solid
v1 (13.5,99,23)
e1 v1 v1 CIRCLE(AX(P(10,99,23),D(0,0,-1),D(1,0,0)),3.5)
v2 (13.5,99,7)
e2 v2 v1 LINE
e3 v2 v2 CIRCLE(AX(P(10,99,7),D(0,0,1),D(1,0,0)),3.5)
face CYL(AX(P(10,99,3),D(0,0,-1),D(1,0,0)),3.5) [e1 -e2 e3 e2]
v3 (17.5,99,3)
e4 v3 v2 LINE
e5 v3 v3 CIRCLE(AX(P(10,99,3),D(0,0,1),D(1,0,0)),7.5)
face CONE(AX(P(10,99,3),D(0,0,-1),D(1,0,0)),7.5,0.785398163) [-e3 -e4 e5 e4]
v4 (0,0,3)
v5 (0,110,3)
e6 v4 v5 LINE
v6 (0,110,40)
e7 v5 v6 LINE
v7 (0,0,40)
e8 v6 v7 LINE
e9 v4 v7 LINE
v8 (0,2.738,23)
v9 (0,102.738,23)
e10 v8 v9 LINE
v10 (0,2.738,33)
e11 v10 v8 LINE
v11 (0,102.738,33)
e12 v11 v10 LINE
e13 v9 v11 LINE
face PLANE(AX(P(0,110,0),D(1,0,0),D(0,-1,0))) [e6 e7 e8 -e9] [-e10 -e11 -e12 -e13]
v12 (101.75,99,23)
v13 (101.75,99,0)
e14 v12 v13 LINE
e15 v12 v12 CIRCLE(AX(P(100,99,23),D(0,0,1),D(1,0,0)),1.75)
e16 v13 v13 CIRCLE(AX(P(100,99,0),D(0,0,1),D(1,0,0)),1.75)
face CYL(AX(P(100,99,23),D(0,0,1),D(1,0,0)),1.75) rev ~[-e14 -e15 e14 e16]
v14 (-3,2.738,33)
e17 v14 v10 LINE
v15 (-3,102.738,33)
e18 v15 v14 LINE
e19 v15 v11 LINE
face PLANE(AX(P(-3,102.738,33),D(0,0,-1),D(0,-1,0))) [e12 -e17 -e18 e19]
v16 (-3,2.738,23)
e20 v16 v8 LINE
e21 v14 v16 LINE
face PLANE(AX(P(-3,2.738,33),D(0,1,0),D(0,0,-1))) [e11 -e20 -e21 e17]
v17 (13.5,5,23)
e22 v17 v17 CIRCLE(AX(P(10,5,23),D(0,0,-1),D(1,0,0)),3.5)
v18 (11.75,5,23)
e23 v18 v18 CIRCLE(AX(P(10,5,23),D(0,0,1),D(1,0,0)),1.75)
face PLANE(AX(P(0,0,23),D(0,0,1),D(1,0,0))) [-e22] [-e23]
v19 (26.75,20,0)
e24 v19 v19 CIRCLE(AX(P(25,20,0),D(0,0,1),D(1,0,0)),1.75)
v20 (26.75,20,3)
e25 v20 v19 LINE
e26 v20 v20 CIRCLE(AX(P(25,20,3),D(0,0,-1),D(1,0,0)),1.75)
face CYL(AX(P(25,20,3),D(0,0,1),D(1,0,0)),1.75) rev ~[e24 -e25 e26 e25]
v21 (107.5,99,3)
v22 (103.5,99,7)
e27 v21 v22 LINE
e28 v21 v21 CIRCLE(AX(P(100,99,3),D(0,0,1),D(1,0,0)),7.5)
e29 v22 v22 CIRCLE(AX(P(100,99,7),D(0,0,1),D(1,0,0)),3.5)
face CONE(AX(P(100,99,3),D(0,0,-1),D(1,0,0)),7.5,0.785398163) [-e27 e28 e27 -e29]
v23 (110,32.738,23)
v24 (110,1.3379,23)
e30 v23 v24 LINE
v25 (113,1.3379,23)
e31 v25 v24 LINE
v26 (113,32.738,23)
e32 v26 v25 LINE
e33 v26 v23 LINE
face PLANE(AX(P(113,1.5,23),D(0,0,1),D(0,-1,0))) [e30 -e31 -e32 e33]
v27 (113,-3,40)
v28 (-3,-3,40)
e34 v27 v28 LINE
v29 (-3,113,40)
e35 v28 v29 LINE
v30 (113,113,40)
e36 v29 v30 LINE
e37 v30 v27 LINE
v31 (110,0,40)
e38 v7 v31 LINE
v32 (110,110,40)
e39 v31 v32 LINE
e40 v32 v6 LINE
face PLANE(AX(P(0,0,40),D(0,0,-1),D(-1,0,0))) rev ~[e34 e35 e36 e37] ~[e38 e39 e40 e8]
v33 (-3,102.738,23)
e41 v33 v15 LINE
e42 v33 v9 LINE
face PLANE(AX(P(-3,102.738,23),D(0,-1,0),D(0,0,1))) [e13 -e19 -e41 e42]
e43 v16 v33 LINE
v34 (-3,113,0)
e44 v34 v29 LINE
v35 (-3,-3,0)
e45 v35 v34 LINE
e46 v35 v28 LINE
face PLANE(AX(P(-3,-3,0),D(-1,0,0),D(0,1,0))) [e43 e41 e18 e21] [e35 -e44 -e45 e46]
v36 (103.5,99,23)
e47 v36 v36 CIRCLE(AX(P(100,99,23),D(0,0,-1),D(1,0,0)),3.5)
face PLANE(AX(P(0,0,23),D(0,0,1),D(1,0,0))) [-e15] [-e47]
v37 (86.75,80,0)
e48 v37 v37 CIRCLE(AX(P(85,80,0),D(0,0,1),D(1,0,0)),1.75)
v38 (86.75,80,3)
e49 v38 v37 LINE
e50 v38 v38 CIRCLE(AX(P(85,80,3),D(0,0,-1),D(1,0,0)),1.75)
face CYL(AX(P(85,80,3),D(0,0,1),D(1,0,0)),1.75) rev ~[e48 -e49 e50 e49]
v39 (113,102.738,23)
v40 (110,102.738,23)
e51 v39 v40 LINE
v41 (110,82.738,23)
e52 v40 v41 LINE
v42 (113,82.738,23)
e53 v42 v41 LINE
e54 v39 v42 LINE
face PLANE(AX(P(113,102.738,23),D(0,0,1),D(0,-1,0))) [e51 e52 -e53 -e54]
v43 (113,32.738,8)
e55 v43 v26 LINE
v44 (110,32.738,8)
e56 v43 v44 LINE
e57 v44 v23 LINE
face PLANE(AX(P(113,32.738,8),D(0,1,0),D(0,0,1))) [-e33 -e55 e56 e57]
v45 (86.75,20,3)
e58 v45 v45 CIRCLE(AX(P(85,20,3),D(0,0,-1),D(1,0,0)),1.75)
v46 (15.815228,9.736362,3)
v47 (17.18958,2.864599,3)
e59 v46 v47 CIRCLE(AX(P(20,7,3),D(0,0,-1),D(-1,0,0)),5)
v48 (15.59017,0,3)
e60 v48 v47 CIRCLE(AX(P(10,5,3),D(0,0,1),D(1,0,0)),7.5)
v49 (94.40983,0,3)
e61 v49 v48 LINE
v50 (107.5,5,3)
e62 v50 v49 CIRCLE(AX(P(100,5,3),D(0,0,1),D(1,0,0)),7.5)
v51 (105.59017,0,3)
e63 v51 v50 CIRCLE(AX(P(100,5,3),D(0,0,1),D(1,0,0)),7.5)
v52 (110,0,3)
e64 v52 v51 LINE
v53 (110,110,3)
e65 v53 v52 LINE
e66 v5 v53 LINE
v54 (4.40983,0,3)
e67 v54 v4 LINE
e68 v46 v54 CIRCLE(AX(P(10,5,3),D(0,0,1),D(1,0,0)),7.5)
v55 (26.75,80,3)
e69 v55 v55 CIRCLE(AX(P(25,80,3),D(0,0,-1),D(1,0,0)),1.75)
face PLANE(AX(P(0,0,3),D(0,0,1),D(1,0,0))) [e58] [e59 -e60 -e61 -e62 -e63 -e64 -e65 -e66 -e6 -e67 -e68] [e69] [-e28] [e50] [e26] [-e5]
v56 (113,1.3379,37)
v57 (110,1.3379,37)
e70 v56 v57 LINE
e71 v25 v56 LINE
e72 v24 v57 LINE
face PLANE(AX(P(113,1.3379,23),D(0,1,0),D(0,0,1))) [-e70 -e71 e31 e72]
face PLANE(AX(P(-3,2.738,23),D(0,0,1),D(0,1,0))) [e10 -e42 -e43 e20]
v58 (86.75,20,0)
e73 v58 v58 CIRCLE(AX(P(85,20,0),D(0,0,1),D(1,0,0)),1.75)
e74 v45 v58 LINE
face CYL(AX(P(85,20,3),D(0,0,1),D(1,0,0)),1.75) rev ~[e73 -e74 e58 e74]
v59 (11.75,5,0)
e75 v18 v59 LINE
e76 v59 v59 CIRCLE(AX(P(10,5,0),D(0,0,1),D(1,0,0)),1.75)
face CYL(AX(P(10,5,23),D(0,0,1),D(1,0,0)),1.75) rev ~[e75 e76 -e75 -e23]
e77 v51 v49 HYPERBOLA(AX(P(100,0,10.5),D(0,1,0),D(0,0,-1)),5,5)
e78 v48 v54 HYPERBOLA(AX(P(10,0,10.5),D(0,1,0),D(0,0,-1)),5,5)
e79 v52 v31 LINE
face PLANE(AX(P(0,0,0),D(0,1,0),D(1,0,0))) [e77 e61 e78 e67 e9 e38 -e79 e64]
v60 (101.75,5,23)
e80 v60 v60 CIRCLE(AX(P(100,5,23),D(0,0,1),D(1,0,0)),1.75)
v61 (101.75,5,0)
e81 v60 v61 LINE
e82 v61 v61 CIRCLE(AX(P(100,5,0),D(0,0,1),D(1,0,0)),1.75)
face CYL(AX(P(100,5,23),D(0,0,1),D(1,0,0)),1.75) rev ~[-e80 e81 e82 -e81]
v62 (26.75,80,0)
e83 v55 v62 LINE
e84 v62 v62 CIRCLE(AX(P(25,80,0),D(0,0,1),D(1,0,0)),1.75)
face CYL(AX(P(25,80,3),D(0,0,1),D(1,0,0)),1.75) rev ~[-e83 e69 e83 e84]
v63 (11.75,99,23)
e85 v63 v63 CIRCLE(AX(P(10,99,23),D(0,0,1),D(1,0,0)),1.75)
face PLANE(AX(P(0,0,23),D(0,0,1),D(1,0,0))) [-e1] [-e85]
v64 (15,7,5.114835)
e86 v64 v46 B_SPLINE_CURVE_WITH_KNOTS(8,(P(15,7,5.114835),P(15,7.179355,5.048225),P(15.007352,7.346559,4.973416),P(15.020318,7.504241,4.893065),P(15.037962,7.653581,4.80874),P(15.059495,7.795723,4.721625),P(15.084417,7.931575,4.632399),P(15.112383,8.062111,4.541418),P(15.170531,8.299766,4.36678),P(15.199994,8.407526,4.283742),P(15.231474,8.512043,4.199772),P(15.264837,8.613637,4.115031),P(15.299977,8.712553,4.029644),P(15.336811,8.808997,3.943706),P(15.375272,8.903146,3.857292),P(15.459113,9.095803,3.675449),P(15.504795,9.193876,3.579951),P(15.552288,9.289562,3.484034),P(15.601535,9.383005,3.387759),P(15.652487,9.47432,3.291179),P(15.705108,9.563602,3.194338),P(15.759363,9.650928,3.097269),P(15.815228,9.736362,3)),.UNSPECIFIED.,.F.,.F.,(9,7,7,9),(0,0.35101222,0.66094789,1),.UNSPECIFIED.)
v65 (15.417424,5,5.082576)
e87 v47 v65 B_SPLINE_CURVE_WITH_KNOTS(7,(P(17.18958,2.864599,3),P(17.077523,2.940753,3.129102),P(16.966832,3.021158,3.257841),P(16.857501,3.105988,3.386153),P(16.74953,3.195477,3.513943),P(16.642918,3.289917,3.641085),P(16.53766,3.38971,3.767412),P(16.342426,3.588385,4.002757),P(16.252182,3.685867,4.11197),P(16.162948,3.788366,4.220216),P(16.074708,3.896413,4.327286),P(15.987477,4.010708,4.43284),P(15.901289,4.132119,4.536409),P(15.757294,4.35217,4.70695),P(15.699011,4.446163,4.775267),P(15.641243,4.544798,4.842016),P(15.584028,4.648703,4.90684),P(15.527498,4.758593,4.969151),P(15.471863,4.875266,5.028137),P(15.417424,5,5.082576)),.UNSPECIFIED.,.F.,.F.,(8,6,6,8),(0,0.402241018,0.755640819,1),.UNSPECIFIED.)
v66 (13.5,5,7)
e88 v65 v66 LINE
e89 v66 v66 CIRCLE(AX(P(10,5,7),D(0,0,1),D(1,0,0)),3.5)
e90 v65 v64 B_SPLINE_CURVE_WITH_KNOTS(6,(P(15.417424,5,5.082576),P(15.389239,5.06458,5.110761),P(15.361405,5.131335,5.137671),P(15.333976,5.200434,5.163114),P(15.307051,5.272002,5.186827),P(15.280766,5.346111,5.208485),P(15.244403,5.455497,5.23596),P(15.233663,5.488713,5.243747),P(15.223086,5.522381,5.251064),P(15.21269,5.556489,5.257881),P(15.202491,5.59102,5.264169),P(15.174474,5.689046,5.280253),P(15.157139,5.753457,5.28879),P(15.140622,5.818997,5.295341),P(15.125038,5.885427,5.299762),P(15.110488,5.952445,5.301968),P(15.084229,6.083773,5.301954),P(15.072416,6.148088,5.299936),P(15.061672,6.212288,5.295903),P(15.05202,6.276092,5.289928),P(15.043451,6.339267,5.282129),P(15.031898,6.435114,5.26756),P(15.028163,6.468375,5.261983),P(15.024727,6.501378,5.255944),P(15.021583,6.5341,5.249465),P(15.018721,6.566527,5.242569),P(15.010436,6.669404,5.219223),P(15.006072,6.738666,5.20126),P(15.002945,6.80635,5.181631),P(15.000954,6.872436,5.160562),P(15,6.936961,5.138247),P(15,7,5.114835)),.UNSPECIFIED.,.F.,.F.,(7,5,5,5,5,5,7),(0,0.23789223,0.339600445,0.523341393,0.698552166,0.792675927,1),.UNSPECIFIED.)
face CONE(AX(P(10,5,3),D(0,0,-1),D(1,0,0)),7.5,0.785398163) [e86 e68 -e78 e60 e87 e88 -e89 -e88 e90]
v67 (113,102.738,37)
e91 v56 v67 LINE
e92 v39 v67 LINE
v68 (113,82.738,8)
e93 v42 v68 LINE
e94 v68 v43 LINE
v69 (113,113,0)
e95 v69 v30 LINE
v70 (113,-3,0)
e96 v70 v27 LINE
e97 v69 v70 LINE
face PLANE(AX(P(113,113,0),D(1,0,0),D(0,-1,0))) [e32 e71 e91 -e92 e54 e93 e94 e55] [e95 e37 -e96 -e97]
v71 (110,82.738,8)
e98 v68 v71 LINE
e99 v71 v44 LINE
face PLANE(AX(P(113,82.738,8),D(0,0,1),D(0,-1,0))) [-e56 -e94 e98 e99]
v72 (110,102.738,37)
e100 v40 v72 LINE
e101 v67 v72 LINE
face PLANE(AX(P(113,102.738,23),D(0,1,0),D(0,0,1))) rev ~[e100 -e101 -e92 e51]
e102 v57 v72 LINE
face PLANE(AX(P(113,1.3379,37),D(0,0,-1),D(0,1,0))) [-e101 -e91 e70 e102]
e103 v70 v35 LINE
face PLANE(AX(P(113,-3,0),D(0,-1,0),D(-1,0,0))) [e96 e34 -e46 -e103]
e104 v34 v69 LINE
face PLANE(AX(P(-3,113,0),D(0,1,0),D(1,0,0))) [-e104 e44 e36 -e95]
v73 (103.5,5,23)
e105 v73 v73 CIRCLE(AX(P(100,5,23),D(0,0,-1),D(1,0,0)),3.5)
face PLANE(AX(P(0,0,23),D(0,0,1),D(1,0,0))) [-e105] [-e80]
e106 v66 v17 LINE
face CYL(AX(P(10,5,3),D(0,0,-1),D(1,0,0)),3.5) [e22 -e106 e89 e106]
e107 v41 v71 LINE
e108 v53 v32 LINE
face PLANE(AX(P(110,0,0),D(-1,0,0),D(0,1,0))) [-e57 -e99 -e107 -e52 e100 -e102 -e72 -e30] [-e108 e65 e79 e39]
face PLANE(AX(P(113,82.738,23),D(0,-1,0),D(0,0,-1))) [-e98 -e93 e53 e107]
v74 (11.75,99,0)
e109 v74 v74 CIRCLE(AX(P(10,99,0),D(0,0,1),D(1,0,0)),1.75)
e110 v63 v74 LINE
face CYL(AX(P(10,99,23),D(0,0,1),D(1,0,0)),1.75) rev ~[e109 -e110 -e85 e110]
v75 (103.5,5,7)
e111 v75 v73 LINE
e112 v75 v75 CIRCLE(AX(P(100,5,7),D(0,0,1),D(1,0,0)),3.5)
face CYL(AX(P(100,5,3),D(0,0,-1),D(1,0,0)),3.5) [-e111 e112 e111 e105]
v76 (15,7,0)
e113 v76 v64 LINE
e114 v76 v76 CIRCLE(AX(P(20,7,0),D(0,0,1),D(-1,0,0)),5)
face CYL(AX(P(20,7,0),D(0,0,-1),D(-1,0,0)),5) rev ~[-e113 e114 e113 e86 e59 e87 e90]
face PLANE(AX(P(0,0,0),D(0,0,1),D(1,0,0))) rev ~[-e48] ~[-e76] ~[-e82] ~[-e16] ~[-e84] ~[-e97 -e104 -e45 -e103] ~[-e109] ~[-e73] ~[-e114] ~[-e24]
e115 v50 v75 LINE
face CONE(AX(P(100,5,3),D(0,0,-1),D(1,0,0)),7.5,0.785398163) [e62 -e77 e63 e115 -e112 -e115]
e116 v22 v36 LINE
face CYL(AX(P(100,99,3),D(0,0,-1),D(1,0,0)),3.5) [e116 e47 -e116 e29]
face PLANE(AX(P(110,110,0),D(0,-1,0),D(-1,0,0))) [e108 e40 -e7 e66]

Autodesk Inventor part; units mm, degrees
ref_plane "YZ Plane" through (0, 0, 0) normal (1, 0, 0) x (0, 1, 0)
ref_plane "XZ Plane" through (0, 0, 0) normal (0, 1, 0) x (-1, 0, 0)
ref_plane "XY Plane" through (0, 0, 0) normal (0, 0, 1) x (1, 0, 0)
sketch "Sketch1" plane through (0, 0, 0) normal (0, 0, 1) x (1, 0, 0)
  line L0 (0, 0) -> (0, 110)
  line L1 (0, 110) -> (110, 110)
  line L2 (110, 110) -> (110, 0)
  line L3 (110, 0) -> (0, 0)
  dimension "d0" = 110
  dimension "d1" = 110
extrude "Extrusion1" add sketch "Sketch1" along normal blind 3
sketch "Sketch2" plane through (0, 0, 0) normal (0, 0, -1) x (-1, 0, 0)
  line L0 (0, 0) -> (3, 0)
  line L1 (3, 0) -> (3, 113)
  line L2 (3, 113) -> (-113, 113)
  line L3 (-113, 113) -> (-113, -3)
  line L4 (-113, -3) -> (3, -3)
  line L5 (3, -3) -> (3, 0)
  line L6 (-110, 110) -> (0, 110)
  line L7 (0, 110) -> (0, 0)
  line L8 (0, 0) -> (-110, 0)
  line L9 (-110, 0) -> (-110, 110)
  dimension "d4" = 3
  dimension "d5" = 113
  dimension "d6" = 116
  dimension "d7" = 116
extrude "Extrusion2" add sketch "Sketch2" against normal blind 40
sketch "Sketch3" plane through (0, 0, 3) normal (0, 0, 1) x (1, 0, 0)
  line L0 (110, 0) -> (0, 0) projected
  line L1 (55, 0) -> (55, 5)
  line L2 (55, 5) -> (10, 5)
  line L3 (55, 5) -> (100, 5)
  line L4 (100, 5) -> (100, 99)
  line L5 (100, 99) -> (10, 99)
  line L6 (10, 99) -> (10, 5)
  circle A0 centre (10, 5) radius 3.5
  circle A1 centre (10, 99) radius 3.5
  circle A2 centre (100, 99) radius 3.5
  circle A3 centre (100, 5) radius 3.5
  dimension "d10" = 5
  dimension "d11" = 45
  dimension "d12" = 45
  dimension "d13" = 94
  dimension "d14" = 90
  dimension "d15" = 7
  dimension "d16" = 7
  dimension "d17" = 7
  dimension "d18" = 7
extrude "Extrusion3" add sketch "Sketch3" along normal blind 20 contours A0 L6 L2 | L2 L6 A0 | A3 L4 L3 | L3 L4 A3 | A1 L5 L6 | L6 L5 A1 | A2 L5 L4 | L4 L5 A2
sketch "Sketch4" plane through (10, 99, 23) normal (0, 0, 1) x (1, 0, 0)
  circle A0 centre (0, 0) radius 1.75
  circle A1 centre (90, 0) radius 3.5 projected
  circle A2 centre (90, 0) radius 1.75
  circle A3 centre (90, -94) radius 3.5 projected
  circle A4 centre (90, -94) radius 1.75
  circle A5 centre (0, -94) radius 3.5 projected
  circle A6 centre (0, -94) radius 1.75
  point P0 (-10, -99)
  point P1 (90, -99)
  point P2 (0, -99)
  dimension "d21" = 3.5
  dimension "d22" = 3.5
  dimension "d23" = 3.5
extrude "Extrusion4" cut sketch "Sketch4" against normal through all contours A0 | A2 | A4 | A6
sketch "Sketch5" plane through (0, 0, 3) normal (0, 0, 1) x (1, 0, 0)
  line L0 (110, 0) -> (0, 0) projected
  line L1 (55, 0) -> (55, 20)
  line L2 (55, 20) -> (85, 20)
  line L3 (85, 20) -> (85, 80)
  line L4 (85, 80) -> (25, 80)
  line L5 (25, 80) -> (25, 20)
  circle A0 centre (25, 20) radius 1.75
  circle A1 centre (25, 80) radius 1.75
  circle A2 centre (85, 80) radius 1.75
  circle A3 centre (85, 20) radius 1.75
  dimension "d26" = 20
  dimension "d27" = 30
  dimension "d28" = 60
  dimension "d29" = 60
  dimension "d30" = 3.5
  dimension "d31" = 3.5
  dimension "d32" = 3.5
  dimension "d33" = 3.5
extrude "Extrusion5" cut sketch "Sketch5" against normal through all
chamfer "Chamfer1" distance 4 angle 45 4 edges at (6.5, 99, 3) (96.5, 99, 3) (6.5, 5, 3) (96.5, 5, 3)
sketch "Sketch6" plane through (113, -3, 0) normal (1, 0, 0) x (0, 0, -1)
  line L0 (-23, 105.5) -> (-23, 98.5) projected
  line L1 (-23, 105.738) -> (-37, 105.738)
  line L2 (-23, 105.738) -> (-9, 105.738) construction
  line L3 (-23, 11.5) -> (-23, 4.5) projected
  line L4 (-23, 4.3379) -> (-37, 4.3379)
  line L5 (-23, 4.3379) -> (-9, 4.3379) construction
  line L6 (-37, 4.3379) -> (-37, 105.738)
  line L7 (-23, 105.738) -> (-23, 85.738)
  line L8 (-23, 85.738) -> (-8, 85.738)
  line L9 (-8, 85.738) -> (-8, 35.738)
  line L10 (-8, 35.738) -> (-23, 35.738)
  line L11 (-23, 35.738) -> (-23, 4.3379)
  point P0 (0, 3)
  dimension "d39" = 14
  dimension "d40" = 180
  dimension "d41" = 14
  dimension "d42" = 180
  dimension "d43" = 20
  dimension "d44" = 15
  dimension "d45" = 50
extrude "Extrusion6" cut sketch "Sketch6" against normal up to surface (3 mm away)
sketch "Sketch7" plane through (-3, -3, 0) normal (-1, 0, 0) x (0, 0, 1)
  line L0 (23, 105.738) -> (33, 105.738)
  line L1 (33, 105.738) -> (33, 5.738)
  line L2 (33, 5.738) -> (23, 5.738)
  line L3 (23, 5.738) -> (23, 105.738)
  point P0 (0, 3)
  dimension "d48" = 10
  dimension "d49" = 100
extrude "Extrusion7" cut sketch "Sketch7" against normal up to surface (3 mm away)
sketch "Sketch8" plane through (0, 0, 0) normal (0, 0, -1) x (-1, 0, 0)
  circle A0 centre (-10, 5) radius 1.75 projected
  line L0 (-10, 5) -> (-20, 5)
  line L1 (-20, 5) -> (-20, 7)
  line L2 (-20, 5) -> (-18, 5) construction
  circle A1 centre (-20, 7) radius 5
  point P0 (0, 0)
  dimension "d52" = 10
  dimension "d53" = 2
  dimension "d54" = 90
  dimension "d55" = 10
extrude "Extrusion8" cut sketch "Sketch8" against normal blind 20 contours A1
equation "\"d15\" = d16"
equation "\"d17\" = d16"
equation "\"d18\" = d16"
properties part number "nuccase"
